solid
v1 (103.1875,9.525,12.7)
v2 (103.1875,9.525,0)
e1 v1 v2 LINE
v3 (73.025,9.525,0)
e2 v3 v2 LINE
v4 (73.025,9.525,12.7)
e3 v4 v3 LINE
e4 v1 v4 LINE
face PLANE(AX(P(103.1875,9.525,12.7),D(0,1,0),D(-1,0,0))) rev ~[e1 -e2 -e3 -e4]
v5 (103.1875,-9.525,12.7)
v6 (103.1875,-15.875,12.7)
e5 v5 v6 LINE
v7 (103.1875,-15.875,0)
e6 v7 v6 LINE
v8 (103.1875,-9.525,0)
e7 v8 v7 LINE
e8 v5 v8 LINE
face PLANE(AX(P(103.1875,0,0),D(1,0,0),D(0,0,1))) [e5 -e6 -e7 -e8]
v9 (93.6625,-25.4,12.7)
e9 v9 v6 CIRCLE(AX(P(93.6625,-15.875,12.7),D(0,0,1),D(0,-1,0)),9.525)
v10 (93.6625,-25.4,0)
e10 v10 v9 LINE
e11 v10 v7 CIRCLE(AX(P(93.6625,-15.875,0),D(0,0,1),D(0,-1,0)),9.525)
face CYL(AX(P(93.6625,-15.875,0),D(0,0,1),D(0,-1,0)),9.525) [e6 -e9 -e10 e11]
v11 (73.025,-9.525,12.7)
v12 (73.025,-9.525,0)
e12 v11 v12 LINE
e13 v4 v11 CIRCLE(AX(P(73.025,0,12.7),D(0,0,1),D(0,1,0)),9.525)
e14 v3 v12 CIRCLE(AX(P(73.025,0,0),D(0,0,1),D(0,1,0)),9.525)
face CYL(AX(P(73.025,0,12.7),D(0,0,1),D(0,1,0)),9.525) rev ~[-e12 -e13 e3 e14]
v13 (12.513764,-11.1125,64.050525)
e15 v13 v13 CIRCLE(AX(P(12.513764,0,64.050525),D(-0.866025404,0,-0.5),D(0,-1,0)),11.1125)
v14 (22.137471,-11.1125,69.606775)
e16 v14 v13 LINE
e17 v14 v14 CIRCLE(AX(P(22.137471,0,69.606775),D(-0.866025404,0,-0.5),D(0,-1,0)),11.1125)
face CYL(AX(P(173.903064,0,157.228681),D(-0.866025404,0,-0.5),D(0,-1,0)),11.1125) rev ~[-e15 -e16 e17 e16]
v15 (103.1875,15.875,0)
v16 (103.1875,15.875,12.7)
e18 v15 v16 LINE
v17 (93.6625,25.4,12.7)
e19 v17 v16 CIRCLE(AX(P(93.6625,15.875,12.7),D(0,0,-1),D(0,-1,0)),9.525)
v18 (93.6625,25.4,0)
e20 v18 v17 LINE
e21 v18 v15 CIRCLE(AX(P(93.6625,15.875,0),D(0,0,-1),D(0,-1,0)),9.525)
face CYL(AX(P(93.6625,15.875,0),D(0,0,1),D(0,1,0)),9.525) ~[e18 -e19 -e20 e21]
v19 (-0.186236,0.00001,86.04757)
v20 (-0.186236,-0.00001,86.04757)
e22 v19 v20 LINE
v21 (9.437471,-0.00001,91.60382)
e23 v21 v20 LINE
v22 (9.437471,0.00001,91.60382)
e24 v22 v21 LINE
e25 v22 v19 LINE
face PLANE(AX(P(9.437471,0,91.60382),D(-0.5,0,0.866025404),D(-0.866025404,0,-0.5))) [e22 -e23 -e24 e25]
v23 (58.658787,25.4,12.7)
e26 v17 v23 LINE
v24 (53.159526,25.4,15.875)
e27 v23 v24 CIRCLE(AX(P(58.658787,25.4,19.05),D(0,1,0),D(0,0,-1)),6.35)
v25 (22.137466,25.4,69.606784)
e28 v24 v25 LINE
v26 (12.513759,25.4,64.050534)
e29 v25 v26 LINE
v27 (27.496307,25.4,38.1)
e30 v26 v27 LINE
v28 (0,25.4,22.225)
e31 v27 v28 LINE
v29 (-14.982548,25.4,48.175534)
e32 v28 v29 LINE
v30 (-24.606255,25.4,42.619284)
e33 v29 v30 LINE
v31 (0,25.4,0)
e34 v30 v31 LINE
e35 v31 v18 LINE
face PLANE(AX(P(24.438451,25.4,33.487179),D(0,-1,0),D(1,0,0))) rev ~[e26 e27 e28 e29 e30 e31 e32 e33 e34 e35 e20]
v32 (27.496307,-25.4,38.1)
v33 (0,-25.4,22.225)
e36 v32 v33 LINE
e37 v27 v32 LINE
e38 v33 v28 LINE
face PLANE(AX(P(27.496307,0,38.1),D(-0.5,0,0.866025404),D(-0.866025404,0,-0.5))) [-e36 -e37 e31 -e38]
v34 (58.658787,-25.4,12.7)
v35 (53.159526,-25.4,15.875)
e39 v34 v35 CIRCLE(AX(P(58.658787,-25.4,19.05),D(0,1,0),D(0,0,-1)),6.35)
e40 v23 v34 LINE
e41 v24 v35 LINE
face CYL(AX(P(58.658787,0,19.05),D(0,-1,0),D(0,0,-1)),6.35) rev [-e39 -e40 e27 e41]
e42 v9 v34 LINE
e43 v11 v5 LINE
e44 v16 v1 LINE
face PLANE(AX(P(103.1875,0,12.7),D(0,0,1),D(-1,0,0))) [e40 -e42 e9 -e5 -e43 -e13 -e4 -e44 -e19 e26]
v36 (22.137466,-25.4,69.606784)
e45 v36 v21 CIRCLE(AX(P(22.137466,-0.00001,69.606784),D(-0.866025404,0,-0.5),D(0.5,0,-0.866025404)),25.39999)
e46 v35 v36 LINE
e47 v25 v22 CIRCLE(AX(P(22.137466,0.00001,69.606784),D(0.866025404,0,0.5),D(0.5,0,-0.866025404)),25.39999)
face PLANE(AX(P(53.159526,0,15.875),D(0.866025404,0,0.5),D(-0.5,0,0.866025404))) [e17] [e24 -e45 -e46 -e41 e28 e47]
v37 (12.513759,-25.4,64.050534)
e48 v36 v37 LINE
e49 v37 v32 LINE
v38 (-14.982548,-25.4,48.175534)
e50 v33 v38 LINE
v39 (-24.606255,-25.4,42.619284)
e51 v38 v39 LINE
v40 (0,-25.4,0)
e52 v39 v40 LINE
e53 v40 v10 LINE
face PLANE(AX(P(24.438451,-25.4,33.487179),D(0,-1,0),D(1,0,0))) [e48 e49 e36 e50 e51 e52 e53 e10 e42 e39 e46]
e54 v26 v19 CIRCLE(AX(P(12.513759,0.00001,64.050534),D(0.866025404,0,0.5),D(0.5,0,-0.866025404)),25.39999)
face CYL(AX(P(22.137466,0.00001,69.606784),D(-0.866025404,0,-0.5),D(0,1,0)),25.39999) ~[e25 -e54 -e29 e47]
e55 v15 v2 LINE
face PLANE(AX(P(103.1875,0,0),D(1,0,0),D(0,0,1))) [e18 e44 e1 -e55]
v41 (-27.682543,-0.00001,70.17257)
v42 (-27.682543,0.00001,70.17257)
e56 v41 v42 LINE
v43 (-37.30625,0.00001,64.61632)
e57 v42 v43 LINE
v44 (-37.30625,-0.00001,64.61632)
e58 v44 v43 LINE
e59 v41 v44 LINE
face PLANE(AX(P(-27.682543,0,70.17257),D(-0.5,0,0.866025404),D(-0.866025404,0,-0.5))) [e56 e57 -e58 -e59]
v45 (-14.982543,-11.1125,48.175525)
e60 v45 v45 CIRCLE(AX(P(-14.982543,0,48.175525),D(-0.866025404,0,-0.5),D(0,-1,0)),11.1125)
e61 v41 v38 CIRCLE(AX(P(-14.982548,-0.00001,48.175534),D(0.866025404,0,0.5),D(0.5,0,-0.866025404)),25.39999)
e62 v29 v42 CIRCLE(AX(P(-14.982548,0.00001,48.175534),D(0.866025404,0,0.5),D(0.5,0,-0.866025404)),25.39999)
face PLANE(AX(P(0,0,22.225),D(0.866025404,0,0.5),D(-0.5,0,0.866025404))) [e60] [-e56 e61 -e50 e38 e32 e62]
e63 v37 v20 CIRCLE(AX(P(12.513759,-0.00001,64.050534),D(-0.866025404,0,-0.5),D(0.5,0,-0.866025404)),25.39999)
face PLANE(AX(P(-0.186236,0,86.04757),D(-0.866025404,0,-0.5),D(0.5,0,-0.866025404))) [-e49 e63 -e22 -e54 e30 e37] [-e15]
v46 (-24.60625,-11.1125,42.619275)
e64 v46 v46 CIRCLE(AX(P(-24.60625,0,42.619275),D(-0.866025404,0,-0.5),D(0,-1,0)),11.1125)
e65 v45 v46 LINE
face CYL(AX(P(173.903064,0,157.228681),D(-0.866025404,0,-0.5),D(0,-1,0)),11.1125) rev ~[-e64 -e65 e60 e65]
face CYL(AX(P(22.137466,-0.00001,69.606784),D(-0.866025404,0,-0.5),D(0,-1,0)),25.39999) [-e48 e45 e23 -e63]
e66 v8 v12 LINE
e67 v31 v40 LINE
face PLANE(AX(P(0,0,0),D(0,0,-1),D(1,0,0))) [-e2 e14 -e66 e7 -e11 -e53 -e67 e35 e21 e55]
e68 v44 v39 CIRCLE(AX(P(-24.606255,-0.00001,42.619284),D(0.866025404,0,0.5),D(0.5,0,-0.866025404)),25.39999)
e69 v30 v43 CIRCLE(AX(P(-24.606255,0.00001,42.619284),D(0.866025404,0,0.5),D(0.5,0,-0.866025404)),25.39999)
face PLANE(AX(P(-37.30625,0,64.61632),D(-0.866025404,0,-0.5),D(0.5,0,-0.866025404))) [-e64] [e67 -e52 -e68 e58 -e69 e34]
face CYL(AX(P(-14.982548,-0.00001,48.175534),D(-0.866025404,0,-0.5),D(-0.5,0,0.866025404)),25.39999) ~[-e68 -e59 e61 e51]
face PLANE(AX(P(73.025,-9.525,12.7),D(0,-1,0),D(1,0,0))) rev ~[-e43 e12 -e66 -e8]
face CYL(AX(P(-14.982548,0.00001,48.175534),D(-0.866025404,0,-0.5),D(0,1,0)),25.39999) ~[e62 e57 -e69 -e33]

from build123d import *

# Parameters (mm, degrees)
F1_DEPTH = 25.4
F3_DEPTH = 12.701
F5_D     = 22.225
F6_R     = 25.39999
F7_R     = 9.525


# Not quite as in the source:
# - a fillet or chamfer is up to 0.001 mm smaller than in the source, because OpenCascade refuses the exact size


with BuildPart() as f1:
    # F0 (on Front) → F1 (new body, symmetric)
    with BuildSketch(Plane.XZ):
        with BuildLine():
            Line((-37.30625, 64.6163204399), (0, 0))
            Line((0, 0), (103.1875, 0))
            Line((103.1875, 0), (103.1875, 12.7))
            Line((103.1875, 12.7), (58.6587873497, 12.7))
            ThreePointArc((58.6587873497, 12.7), (55.4837873497, 13.550738686), (53.1595260356, 15.875))
            Line((53.1595260356, 15.875), (9.4374711693, 91.6038204399))
            Line((9.4374711693, 91.6038204399), (-0.1862361303, 86.0475704399))
            Line((-0.1862361303, 86.0475704399), (27.4963065702, 38.1))
            Line((27.4963065702, 38.1), (0, 22.225))
            Line((0, 22.225), (-27.6825427004, 70.1725704399))
            Line((-27.6825427004, 70.1725704399), (-37.30625, 64.6163204399))
        make_face()
    extrude(amount=F1_DEPTH, both=True)

    # F2 (on face) → F3 (cut, through all)
    with BuildSketch(Plane.XY.offset(12.7)):
        with BuildLine():
            Line((103.1875, 9.525), (73.025, 9.525))
            ThreePointArc((73.025, 9.525), (63.5, 0), (73.025, -9.525))
            Line((73.025, -9.525), (103.1875, -9.525))
            Line((103.1875, -9.525), (103.1875, 9.525))
        make_face()
    extrude(amount=-F3_DEPTH, mode=Mode.SUBTRACT)

    # F5 (through all)
    with Locations(Plane(origin=(46.7437211693, 0, 26.9875), x_dir=(0, 1, 0), z_dir=(0.8660254038, 0, 0.5))):
        with Locations((0, 49.2125)):
            Hole(F5_D / 2)

    # F6 (radius 25.4 in the source; OpenCascade refuses exactly that, so slightly less here)
    f6_edges = [f1.edges().sort_by_distance(p)[0] for p in [
        (-32.494396, 25.4, 67.394445),
        (4.625618, 25.4, 88.825695),
        (-32.494396, -25.4, 67.394445),
        (4.625618, -25.4, 88.825695),
    ]]
    fillet(f6_edges, radius=F6_R)

    # F7
    f7_edges = [f1.edges().sort_by_distance(p)[0] for p in [
        (103.1875, 25.4, 6.35),
        (103.1875, -25.4, 6.35),
    ]]
    fillet(f7_edges, radius=F7_R)


solid = f1.part
